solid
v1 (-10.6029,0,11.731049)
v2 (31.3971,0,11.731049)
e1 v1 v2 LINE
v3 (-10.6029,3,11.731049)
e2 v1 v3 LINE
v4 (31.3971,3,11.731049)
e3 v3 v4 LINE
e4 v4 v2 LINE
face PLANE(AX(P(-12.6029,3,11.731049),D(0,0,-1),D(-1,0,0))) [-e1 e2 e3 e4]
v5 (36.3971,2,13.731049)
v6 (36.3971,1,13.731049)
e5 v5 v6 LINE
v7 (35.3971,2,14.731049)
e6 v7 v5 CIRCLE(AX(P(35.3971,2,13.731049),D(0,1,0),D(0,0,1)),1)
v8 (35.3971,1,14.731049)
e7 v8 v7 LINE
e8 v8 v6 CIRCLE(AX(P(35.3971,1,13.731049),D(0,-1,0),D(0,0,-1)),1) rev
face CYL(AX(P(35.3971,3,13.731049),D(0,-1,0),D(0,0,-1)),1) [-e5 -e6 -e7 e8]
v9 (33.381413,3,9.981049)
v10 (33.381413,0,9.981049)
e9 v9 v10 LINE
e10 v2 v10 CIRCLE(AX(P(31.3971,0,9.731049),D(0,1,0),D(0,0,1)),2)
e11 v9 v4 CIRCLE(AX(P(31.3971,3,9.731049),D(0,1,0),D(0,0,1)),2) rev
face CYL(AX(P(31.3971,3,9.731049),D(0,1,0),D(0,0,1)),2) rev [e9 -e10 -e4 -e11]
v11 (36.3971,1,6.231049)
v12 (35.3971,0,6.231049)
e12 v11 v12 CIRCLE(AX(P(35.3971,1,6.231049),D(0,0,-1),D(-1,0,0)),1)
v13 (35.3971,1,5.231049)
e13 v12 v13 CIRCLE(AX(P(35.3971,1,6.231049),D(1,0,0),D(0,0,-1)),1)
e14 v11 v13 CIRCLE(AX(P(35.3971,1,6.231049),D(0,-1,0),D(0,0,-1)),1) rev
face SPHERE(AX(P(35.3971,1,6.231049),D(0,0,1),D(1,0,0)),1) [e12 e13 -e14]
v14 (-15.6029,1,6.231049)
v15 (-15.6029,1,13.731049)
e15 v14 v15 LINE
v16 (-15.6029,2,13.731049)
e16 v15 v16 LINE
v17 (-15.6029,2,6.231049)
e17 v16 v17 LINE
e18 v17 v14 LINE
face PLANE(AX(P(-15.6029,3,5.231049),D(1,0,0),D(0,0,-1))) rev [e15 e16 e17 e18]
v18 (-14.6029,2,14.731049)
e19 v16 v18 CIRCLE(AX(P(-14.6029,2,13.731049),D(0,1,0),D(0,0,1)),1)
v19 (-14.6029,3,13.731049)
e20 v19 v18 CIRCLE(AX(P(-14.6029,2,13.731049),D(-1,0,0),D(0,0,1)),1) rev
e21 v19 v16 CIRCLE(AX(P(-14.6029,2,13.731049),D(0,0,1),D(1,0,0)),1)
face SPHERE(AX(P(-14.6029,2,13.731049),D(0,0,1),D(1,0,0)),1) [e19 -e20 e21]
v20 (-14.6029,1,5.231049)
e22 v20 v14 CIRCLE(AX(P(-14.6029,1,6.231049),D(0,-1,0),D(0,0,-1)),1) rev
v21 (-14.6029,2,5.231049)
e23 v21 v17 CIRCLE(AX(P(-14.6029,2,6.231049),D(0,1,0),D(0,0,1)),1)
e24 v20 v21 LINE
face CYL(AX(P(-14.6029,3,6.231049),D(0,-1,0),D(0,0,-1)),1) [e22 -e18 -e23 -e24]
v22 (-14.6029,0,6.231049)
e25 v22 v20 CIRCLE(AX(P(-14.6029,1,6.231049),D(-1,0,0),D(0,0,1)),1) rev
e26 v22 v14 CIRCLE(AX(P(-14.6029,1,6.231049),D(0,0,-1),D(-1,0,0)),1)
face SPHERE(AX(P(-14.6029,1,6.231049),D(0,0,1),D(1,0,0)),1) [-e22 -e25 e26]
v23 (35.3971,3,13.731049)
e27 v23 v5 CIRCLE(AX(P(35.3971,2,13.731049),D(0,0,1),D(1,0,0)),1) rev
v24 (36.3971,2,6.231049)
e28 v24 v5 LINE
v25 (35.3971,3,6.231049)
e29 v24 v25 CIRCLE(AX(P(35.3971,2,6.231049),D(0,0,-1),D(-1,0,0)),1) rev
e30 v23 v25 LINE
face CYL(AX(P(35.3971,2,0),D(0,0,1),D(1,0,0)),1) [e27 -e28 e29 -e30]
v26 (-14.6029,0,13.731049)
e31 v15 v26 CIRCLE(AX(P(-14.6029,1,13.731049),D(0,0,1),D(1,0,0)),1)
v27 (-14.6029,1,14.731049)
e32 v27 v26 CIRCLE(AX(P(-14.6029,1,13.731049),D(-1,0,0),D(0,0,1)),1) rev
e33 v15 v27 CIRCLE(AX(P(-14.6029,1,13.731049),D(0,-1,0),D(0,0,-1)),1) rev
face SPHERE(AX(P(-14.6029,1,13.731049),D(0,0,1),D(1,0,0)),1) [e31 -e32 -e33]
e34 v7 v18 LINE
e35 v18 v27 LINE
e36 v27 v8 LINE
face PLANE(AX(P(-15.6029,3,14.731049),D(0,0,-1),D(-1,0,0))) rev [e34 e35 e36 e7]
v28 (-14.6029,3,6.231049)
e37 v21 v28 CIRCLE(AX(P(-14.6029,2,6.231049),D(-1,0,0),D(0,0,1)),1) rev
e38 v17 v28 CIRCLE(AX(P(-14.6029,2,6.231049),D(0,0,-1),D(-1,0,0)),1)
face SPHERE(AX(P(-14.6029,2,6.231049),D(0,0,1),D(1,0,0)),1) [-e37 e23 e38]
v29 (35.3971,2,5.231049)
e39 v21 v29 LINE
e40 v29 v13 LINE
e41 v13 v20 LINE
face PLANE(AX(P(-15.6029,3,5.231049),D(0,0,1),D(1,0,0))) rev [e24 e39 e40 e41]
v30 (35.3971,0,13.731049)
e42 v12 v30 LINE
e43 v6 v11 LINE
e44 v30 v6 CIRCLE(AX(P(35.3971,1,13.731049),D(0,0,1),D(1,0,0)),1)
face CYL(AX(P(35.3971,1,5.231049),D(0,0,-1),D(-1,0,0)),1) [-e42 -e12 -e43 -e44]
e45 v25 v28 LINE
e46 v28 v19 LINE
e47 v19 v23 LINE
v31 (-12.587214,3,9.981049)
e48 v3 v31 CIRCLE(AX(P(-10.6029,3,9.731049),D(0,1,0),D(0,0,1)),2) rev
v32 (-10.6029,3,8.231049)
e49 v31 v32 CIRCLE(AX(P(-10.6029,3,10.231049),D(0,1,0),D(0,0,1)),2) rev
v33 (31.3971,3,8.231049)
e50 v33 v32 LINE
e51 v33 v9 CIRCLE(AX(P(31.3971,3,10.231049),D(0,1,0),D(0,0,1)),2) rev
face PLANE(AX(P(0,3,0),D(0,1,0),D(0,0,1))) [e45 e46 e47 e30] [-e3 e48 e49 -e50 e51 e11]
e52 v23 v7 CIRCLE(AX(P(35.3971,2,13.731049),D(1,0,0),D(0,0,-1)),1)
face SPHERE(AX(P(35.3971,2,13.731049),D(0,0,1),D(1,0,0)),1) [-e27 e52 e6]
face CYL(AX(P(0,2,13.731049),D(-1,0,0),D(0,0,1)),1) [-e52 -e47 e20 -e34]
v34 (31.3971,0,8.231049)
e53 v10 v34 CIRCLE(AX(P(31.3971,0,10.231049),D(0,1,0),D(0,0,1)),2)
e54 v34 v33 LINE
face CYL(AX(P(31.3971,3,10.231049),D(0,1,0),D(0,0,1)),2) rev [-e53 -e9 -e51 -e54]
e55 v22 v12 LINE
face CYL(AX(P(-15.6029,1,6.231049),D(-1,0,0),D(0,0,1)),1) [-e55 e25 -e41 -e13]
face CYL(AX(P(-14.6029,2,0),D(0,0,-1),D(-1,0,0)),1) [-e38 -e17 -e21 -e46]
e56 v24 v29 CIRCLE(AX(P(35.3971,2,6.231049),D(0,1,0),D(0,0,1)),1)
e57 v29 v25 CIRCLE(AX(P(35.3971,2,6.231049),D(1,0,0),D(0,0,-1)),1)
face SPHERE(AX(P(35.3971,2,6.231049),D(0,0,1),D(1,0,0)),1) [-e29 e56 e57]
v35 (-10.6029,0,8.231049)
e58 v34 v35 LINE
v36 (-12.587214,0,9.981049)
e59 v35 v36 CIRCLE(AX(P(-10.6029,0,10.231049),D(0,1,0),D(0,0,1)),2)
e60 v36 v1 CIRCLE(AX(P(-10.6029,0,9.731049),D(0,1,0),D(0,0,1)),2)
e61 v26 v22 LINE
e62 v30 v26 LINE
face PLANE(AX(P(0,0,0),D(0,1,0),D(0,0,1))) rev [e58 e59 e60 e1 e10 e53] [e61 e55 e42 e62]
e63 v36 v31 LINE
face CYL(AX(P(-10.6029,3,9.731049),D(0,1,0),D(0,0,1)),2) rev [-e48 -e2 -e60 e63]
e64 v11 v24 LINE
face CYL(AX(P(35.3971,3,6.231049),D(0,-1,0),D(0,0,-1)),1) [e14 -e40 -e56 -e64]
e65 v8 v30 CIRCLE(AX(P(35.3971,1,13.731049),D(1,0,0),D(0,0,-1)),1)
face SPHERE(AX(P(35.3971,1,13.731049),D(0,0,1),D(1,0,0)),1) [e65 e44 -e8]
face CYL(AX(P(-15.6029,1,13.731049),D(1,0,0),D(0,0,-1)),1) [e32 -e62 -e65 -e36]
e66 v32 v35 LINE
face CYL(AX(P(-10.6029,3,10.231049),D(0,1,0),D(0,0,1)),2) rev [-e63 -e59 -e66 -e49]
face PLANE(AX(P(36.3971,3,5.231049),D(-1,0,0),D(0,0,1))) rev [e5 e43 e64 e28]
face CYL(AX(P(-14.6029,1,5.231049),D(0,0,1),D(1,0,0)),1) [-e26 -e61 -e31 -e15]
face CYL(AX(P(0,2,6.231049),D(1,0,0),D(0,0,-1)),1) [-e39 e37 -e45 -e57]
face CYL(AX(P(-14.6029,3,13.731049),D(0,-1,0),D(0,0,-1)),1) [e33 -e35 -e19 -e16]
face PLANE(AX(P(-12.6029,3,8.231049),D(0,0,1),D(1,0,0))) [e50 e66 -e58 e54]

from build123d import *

# Parameters (mm, degrees)
SKETCH2_W           = 52
SKETCH2_H           = 9.5
SKETCH2_W_2         = 46
SKETCH2_H_2         = 3.5
BOSS_EXTRUDE1_DEPTH = 3
FILLET1_R           = 2
FILLET2_R           = 1


with BuildPart() as part:
    # Sketch2 → Boss-Extrude1 (new body)
    with BuildSketch(Plane(origin=(0, 0, 0), x_dir=(1, 0, 0), z_dir=(0, 1, 0))):
        with Locations((10.397099769, -9.98104869)):
            Rectangle(SKETCH2_W, SKETCH2_H)
        with Locations((10.397099769, -9.98104869)):
            Rectangle(SKETCH2_W_2, SKETCH2_H_2, mode=Mode.SUBTRACT)
    extrude(amount=BOSS_EXTRUDE1_DEPTH)

    # Fillet1
    # the kernel refuses this fillet: 2 mm, written as the material it adds along each edge
    with BuildSketch(Plane(origin=(33.397099769, 0, 11.73104869), x_dir=(-1, 0, 0), z_dir=(0, 1, 0)), Plane(origin=(33.397099769, 0, 8.23104869), x_dir=(0, 0, 1), z_dir=(0, 1, 0)), Plane(origin=(-12.602900231, 0, 11.73104869), x_dir=(0, 0, -1), z_dir=(0, 1, 0))) as fillet1_piece_1:
        with BuildLine():
            CenterArc((FILLET1_R, -FILLET1_R), FILLET1_R, 90, 90)
            Line((0, -FILLET1_R), (0, 0))
            Line((0, 0), (FILLET1_R, 0))
        make_face()
    extrude(amount=3)
    with BuildSketch(Plane(origin=(-12.602900231, 0, 8.23104869), x_dir=(0, 0, 1), z_dir=(0, 1, 0))) as fillet1_piece_2:
        with BuildLine():
            CenterArc((FILLET1_R, FILLET1_R), FILLET1_R, 180, 90)
            Line((0, FILLET1_R), (0, 0))
            Line((0, 0), (FILLET1_R, 0))
        make_face()
    extrude(amount=3)

    # Fillet2
    fillet2_edges = [part.edges().sort_by_distance(p)[0] for p in [
        (36.397099769, 3, 9.98104869),
        (10.397099769, 3, 5.23104869),
        (-15.602900231, 3, 9.98104869),
        (10.397099769, 0, 5.23104869),
        (36.397099769, 0, 9.98104869),
        (10.397099769, 0, 14.73104869),
        (-15.602900231, 0, 9.98104869),
        (-15.602900231, 1.5, 5.23104869),
        (36.397099769, 1.5, 5.23104869),
        (36.397099769, 1.5, 14.73104869),
        (-15.602900231, 1.5, 14.73104869),
        (10.397099769, 3, 14.73104869),
    ]]
    fillet(fillet2_edges, radius=FILLET2_R)


solid = part.part
